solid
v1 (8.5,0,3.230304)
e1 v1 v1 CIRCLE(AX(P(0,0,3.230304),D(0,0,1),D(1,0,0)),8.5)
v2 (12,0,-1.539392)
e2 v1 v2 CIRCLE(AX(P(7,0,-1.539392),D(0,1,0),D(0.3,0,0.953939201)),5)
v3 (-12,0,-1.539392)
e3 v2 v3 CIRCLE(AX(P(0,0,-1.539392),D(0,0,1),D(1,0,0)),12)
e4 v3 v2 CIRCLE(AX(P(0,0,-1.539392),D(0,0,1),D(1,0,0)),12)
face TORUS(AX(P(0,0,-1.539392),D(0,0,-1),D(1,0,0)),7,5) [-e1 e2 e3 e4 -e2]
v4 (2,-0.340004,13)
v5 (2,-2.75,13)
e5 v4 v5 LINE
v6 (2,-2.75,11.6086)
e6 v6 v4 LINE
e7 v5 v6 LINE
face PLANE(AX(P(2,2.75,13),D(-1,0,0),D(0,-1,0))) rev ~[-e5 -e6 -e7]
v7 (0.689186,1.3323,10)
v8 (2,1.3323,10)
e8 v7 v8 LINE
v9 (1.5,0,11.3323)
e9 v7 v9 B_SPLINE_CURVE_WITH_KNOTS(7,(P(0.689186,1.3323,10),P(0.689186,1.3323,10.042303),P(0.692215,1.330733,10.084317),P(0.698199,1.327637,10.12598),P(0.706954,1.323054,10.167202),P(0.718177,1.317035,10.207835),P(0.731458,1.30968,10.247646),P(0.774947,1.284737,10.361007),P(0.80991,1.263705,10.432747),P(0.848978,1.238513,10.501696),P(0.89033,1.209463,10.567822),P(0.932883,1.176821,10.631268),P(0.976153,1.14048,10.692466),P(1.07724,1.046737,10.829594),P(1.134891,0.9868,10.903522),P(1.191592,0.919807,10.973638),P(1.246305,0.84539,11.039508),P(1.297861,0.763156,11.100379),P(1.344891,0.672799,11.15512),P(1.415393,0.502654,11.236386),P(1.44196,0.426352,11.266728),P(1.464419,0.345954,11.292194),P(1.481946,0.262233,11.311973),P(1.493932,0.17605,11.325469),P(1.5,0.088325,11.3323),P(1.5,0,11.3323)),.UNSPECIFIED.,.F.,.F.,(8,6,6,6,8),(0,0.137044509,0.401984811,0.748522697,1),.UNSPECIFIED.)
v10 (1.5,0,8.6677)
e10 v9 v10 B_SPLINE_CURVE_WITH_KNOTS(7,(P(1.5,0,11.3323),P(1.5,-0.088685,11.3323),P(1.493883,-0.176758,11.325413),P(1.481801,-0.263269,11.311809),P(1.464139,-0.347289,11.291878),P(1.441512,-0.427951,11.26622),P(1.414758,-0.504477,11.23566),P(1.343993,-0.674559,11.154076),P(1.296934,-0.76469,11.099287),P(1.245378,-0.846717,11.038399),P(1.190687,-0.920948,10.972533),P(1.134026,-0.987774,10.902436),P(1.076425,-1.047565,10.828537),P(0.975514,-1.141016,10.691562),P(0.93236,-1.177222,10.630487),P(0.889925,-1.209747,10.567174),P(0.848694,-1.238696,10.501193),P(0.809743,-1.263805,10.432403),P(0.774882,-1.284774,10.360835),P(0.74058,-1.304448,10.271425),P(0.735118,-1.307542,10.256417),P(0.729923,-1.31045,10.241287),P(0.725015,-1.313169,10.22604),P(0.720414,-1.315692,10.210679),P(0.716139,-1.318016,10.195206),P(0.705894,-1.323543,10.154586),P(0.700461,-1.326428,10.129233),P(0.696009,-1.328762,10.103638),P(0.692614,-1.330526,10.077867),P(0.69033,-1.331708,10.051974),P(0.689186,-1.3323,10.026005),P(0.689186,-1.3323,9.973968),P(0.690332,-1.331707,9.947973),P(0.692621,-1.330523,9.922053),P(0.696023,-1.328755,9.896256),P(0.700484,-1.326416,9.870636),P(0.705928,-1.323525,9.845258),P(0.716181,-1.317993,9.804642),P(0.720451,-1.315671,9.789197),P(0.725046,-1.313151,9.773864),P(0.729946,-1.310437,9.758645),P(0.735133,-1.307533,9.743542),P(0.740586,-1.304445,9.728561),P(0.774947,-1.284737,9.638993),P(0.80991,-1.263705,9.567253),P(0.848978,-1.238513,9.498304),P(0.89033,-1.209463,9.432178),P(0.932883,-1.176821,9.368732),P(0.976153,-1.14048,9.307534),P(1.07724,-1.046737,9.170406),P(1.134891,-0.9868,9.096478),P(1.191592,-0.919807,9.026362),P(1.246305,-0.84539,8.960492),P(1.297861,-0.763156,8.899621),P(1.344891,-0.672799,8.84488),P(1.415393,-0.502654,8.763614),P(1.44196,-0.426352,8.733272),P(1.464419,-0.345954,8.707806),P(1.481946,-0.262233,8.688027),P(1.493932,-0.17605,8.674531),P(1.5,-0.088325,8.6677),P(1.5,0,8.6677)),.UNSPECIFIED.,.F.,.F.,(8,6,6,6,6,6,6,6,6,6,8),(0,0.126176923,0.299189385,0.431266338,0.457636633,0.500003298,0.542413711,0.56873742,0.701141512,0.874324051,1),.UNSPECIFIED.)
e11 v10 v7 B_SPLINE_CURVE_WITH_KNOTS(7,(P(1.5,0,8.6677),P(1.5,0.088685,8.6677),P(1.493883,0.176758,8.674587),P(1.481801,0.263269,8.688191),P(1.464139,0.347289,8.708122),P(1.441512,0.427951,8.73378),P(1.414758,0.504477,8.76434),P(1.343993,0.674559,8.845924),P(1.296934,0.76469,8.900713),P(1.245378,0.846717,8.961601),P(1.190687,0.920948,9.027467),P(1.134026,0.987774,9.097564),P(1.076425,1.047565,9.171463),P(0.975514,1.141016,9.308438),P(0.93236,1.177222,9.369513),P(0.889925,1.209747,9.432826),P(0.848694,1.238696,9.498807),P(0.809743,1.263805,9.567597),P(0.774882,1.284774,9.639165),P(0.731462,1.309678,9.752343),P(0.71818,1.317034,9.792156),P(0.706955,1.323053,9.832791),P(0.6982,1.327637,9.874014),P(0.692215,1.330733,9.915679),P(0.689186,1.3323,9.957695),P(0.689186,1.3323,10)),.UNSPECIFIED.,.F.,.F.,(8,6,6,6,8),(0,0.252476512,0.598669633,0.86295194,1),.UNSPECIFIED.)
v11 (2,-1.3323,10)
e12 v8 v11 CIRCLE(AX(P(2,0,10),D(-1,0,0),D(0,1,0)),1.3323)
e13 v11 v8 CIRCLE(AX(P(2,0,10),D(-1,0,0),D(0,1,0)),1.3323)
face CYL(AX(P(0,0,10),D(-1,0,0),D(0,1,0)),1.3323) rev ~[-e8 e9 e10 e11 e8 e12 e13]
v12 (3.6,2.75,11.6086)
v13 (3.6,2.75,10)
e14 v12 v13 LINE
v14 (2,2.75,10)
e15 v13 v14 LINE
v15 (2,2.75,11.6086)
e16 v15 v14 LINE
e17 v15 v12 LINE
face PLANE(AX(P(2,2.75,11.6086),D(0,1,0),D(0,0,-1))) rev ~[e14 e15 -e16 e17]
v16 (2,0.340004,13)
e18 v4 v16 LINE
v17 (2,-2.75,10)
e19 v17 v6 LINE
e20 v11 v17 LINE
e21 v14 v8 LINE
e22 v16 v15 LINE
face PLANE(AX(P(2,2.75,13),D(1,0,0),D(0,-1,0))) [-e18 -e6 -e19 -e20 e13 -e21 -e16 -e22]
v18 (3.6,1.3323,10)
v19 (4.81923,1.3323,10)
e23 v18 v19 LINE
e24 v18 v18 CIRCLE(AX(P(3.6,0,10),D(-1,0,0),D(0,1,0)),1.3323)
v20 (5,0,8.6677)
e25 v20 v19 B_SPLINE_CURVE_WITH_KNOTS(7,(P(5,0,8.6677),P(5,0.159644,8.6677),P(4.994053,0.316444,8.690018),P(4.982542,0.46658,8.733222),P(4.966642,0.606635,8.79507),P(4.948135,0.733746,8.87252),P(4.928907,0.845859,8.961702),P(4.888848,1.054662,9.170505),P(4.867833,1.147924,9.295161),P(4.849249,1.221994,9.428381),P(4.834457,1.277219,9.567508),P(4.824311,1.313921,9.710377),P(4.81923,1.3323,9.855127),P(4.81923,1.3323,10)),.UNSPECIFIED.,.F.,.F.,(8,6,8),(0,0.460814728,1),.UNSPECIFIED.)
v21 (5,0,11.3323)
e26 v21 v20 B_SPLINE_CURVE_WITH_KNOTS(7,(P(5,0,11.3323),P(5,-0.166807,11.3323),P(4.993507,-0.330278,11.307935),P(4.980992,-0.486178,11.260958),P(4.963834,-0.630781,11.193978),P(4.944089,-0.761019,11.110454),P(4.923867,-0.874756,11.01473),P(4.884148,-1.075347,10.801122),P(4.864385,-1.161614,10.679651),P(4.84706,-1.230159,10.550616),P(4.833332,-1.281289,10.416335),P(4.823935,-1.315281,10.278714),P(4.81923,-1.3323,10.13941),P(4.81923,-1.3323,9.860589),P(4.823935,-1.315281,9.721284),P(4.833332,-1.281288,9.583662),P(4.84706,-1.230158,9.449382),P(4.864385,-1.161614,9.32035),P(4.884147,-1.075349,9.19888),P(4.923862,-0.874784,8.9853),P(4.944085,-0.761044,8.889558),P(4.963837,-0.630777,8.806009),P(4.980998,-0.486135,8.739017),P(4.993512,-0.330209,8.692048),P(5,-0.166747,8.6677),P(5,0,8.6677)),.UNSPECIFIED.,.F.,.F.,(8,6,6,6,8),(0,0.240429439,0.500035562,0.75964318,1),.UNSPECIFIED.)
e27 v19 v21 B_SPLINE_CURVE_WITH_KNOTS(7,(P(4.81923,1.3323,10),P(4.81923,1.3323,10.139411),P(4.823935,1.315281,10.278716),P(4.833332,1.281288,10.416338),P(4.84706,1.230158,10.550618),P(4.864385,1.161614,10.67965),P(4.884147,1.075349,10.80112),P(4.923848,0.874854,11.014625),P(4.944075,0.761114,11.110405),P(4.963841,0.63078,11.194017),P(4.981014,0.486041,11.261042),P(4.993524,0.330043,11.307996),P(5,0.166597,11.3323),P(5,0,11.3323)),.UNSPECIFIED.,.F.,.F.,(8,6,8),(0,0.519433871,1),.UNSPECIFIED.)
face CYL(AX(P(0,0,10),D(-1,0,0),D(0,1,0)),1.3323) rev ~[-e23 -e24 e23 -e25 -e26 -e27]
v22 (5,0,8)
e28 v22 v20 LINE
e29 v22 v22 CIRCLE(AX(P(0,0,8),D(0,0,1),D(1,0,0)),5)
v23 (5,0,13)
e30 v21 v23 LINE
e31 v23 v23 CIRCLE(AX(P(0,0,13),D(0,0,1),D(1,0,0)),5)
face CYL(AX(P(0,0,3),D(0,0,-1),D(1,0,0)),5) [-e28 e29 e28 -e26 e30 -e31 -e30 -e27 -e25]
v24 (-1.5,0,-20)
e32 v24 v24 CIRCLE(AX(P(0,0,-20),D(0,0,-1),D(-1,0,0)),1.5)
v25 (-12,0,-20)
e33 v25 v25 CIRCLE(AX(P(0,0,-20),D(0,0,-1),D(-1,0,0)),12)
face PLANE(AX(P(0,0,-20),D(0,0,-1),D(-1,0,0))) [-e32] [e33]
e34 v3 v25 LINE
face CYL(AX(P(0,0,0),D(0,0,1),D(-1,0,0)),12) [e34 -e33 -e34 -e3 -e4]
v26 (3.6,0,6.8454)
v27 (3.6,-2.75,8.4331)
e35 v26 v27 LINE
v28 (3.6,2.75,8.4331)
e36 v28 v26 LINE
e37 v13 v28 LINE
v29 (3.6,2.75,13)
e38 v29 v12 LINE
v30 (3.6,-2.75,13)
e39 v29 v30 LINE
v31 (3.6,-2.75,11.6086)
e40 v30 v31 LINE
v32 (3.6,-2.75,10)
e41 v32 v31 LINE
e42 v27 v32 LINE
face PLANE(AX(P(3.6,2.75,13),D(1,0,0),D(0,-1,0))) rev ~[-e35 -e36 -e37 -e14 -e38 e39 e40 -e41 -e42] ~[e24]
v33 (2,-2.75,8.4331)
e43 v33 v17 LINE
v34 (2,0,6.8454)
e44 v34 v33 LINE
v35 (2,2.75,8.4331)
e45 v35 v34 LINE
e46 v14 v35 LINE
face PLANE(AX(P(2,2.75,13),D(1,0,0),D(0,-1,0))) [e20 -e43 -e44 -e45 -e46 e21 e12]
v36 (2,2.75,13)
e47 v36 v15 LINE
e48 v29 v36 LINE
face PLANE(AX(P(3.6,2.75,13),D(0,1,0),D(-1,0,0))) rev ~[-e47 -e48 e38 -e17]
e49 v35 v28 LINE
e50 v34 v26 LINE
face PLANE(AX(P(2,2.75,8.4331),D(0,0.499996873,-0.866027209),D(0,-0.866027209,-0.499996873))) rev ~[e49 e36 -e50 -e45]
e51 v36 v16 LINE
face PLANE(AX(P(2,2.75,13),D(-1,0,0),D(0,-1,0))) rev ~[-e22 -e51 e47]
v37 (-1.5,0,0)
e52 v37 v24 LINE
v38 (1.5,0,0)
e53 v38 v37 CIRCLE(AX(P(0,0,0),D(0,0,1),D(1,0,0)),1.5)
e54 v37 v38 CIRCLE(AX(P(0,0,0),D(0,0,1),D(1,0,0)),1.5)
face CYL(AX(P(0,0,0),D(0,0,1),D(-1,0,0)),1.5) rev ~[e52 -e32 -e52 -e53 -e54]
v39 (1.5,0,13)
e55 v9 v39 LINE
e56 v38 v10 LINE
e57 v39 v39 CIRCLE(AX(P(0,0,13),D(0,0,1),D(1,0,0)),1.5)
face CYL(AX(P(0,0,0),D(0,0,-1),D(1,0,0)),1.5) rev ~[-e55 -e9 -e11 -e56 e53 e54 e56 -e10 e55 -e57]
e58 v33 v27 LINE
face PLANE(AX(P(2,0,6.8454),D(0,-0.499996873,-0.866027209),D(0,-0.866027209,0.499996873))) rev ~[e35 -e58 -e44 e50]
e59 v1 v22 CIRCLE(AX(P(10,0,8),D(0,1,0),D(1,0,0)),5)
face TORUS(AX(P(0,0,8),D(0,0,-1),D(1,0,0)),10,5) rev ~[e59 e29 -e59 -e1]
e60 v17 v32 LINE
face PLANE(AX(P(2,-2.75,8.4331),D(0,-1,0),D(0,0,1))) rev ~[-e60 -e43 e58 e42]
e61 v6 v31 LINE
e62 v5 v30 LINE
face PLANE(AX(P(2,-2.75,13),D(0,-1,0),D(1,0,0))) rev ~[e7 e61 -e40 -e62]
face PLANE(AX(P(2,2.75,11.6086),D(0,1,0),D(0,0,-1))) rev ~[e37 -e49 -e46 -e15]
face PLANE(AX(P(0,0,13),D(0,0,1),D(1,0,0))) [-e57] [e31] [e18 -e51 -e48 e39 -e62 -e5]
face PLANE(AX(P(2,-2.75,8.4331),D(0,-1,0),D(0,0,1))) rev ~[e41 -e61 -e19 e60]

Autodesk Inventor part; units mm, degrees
ref_plane "YZ Plane" through (0, 0, 0) normal (1, 0, 0) x (0, 1, 0)
sketch "Sketch1" plane through (0, 0, 0) normal (0, 0, 1) x (1, 0, 0)
  circle A0 centre (0, 0) radius 12
  circle A1 centre (0, 0) radius 1.5
  dimension "d0" = 24
  dimension "d2" = 3
extrude "Extrusion1" add sketch "Sketch1" along normal blind 3
sketch "Sketch2" plane through (0, 0, 3) normal (0, 0, 1) x (1, 0, 0)
  circle A0 centre (0, 0) radius 1.5 projected
  circle A1 centre (0, 0) radius 12 projected
  circle A2 centre (0, 0) radius 5
  dimension "d5" = 10
extrude "Extrusion2" add sketch "Sketch2" along normal blind 10 contours A2
sketch "Sketch14" plane through (0, 0, 0) normal (0, 0, -1) x (-1, 0, 0)
  circle A0 centre (0, 0) radius 1.5 projected
  circle A1 centre (0, 0) radius 12 projected
extrude "Extrusion11" add sketch "Sketch14" along normal blind 20
ref_plane "Work Plane6" through (0, 0, 8) normal (0, 0, 1) x (1, 0, 0)
sketch "Sketch15" plane through (0, 0, 8) normal (0, 0, 1) x (1, 0, 0)
  line L0 (0, -4.8919) -> (0, 6.5751)
  point P0 (0, 0)
ref_plane "Work Plane7" through (0, -4.8919, 8) normal (1, 0, 0) x (0, 1, 0)
fillet "Fillet3" radius 5 1 edges at (-5, 0, 3)
fillet "Fillet4" radius 5 1 edges at (-12, 0, 3)
sketch "Sketch17" plane through (0, 0, 13) normal (0, 0, 1) x (1, 0, 0)
  circle A0 centre (0, 0) radius 1.5 projected
  circle A1 centre (0, 0) radius 5 projected
  line L0 (0, -5) -> (0, 5)
ref_plane "Work Plane8" through (0, -5, 13) normal (1, 0, 0) x (0, 1, 0)
sketch "Sketch18" plane through (0, -5, 13) normal (1, 0, 0) x (0, 1, 0)
  circle A0 centre (5, -3) radius 1.3323
  line L0 (10, 0) -> (0, 0) projected
  point P0 (5, -13)
  dimension "d88" = 3
extrude "Extrusion13" cut sketch "Sketch18" along normal blind 10
sketch "Sketch19" plane through (0, 0, 13) normal (0, 0, 1) x (1, 0, 0)
  circle A0 centre (0, 0) radius 1.5 projected
  line L0 (2, -2.75) -> (3.6, -2.75)
  line L1 (3.6, -2.75) -> (3.6, 2.75)
  line L2 (3.6, 2.75) -> (2, 2.75)
  line L3 (2, 2.75) -> (2, -2.75)
  dimension "d91" = 5.5
  dimension "d93" = 2.75
  dimension "d94" = 1.6
  dimension "d95" = 2
ref_plane "Work Plane9" through (2, 2.75, 13) normal (1, 0, 0) x (0, -1, 0)
sketch "Sketch20" plane through (2, 2.75, 13) normal (1, 0, 0) x (0, -1, 0)
  line L0 (2.75, 6.1546) -> (5.5, 4.5669)
  line L1 (5.5, 4.5669) -> (5.5, 1.3914)
  line L2 (5.5, 1.3914) -> (2.75, -0.1963)
  line L3 (2.75, -0.1963) -> (0, 1.3914)
  line L4 (0, 1.3914) -> (0, 4.5669)
  line L5 (0, 4.5669) -> (2.75, 6.1546)
  point P0 (2.75, 13)
  point P1 (2.75, 2.9792)
  dimension "d97" = 5.5
extrude "Extrusion14" cut sketch "Sketch20" along normal blind 1.6
sketch "Sketch21" plane through (0, 0, 13) normal (0, 0, 1) x (1, 0, 0)
  line L0 (2, 0.34) -> (3.6, 0.34) projected
  line L1 (3.6, 0.34) -> (3.6, -0.34) projected
  line L2 (3.6, -0.34) -> (2, -0.34) projected
  line L3 (2, -0.34) -> (2, 0.34) projected
  circle A0 centre (0, 0) radius 1.5 projected
  circle A1 centre (0, 0) radius 5 projected
  line L4 (2, -2.7571) -> (3.6, -2.7571)
  line L5 (3.6, -2.7571) -> (3.6, 2.7571)
  line L6 (3.6, 2.7571) -> (2, 2.7571)
  line L7 (2, 2.7571) -> (2, -2.7571)
extrude "Extrusion15" cut sketch "Sketch19" against normal blind 3 contours L3 L2 L1 L0
properties part number "support shaft end"
